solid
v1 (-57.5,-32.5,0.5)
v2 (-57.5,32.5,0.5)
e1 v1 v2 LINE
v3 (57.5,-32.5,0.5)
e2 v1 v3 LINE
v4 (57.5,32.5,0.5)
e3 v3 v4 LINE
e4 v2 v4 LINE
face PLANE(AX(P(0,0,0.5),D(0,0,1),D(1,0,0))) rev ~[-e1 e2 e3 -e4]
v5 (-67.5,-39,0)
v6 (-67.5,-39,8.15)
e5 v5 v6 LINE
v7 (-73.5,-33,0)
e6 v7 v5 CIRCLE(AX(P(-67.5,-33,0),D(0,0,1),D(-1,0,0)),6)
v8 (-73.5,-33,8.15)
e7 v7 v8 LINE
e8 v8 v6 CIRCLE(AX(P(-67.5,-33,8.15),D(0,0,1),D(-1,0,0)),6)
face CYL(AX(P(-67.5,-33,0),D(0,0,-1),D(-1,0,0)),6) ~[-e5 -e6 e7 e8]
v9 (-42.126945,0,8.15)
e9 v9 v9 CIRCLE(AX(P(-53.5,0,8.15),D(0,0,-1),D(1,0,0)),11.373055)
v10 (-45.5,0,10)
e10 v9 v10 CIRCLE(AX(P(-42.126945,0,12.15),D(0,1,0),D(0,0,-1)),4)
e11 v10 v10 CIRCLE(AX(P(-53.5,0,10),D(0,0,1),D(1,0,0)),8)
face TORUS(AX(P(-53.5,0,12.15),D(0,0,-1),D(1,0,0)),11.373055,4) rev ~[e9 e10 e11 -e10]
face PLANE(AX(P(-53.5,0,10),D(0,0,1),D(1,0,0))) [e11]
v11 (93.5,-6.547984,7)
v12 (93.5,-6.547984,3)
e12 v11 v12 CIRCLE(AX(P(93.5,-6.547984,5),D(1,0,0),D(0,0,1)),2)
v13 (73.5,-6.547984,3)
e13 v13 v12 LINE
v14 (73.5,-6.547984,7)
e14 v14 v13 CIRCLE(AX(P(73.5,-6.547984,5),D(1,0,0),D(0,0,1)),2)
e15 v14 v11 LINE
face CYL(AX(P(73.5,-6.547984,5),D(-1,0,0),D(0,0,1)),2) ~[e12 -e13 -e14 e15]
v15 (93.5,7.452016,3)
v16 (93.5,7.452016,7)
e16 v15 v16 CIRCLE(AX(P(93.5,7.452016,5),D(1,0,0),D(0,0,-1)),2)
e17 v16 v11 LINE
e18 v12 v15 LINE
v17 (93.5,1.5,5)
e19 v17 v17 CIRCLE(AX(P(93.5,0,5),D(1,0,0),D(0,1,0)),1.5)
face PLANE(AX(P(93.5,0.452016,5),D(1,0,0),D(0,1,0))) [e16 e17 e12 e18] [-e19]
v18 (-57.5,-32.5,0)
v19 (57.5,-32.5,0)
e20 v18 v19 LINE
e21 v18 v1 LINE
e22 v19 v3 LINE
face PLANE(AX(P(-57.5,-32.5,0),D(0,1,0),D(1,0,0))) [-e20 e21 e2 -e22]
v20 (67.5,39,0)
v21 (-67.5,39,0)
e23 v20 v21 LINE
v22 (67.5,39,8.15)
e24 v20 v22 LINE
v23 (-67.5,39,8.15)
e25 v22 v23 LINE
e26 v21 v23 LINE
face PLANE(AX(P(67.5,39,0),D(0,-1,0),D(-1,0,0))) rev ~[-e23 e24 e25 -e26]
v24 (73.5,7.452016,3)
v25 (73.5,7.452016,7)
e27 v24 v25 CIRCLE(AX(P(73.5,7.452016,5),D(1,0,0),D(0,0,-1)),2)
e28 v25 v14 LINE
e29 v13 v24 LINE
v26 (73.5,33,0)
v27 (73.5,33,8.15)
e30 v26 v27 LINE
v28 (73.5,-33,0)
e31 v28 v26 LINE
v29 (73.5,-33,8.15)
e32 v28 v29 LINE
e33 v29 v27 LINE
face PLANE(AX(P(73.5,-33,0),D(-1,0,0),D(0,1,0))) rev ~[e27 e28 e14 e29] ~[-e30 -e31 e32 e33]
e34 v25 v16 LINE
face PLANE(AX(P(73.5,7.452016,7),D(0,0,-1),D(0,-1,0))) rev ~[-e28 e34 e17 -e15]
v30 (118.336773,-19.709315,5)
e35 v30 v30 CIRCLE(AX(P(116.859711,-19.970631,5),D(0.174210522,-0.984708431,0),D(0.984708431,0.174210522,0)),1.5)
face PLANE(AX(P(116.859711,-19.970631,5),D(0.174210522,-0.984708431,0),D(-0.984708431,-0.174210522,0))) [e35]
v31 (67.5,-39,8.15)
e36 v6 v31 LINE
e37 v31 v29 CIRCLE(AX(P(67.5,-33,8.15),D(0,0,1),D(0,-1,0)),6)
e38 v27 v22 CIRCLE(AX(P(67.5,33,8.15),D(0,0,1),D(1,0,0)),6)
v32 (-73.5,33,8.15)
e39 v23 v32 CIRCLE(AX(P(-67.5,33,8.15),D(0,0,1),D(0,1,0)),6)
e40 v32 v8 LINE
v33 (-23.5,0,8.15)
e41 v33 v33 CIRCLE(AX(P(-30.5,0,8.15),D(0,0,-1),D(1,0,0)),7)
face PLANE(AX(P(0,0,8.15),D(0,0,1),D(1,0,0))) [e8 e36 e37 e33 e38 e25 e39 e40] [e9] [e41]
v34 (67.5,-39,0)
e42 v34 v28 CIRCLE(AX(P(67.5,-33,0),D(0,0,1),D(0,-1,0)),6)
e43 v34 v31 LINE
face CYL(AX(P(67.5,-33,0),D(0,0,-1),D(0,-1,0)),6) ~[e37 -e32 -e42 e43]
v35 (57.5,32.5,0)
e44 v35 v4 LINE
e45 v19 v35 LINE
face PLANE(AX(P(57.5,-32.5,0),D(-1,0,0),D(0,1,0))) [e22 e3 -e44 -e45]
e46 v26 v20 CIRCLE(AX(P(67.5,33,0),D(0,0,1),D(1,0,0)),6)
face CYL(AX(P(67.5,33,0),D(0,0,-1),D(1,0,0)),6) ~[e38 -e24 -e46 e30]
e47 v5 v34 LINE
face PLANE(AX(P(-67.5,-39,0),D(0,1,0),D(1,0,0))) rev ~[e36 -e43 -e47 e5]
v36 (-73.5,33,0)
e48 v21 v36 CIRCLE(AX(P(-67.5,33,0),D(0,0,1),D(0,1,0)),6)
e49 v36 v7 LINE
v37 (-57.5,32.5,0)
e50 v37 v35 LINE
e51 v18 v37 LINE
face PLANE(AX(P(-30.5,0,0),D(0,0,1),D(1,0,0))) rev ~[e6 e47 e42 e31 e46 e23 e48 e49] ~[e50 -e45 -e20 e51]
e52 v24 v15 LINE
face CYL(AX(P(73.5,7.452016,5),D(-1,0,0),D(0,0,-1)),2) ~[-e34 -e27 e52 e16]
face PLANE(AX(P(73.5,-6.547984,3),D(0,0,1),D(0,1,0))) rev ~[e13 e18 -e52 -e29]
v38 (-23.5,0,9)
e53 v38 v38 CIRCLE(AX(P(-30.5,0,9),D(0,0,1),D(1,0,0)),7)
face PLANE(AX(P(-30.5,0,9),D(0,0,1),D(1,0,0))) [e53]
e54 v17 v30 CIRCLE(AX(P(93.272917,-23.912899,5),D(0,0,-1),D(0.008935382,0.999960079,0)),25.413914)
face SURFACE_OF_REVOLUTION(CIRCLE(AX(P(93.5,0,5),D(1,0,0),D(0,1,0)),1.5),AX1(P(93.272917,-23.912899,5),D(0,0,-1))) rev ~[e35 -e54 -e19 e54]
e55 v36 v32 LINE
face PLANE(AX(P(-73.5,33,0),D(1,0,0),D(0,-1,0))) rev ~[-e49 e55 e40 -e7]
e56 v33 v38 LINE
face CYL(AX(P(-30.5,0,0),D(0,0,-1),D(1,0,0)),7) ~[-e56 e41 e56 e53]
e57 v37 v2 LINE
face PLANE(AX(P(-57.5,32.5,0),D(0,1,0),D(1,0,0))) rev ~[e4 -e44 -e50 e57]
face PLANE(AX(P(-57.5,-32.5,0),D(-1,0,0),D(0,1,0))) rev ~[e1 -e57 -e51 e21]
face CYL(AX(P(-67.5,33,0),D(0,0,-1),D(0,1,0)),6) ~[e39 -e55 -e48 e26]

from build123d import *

# Parameters (mm, degrees)
F0_R     = 8
F0_R_2   = 7
F1_DEPTH = 8.15
F2_DEPTH = 10
F3_DEPTH = 9
F5_W     = 115
F5_H     = 65
F6_DEPTH = 0.5
F8_DEPTH = 20
F11_R    = 1.5


# Not quite as in the source:
# - a fillet or chamfer that OpenCascade refuses, or shapes differently, is made with other operations: its cross-section is extruded or revolved along the edge and cut away or added


with BuildPart() as f1:
    # F0 (on Top) → F1 (new body)
    with BuildSketch(Plane.XY):
        with BuildLine():
            Line((-67.5, -39), (67.5, -39))
            ThreePointArc((67.5, -39), (71.7426406871, -37.2426406871), (73.5, -33))
            Line((73.5, -33), (73.5, 33))
            ThreePointArc((73.5, 33), (71.7426406871, 37.2426406871), (67.5, 39))
            Line((67.5, 39), (-67.5, 39))
            ThreePointArc((-67.5, 39), (-71.7426406871, 37.2426406871), (-73.5, 33))
            Line((-73.5, 33), (-73.5, -33))
            ThreePointArc((-73.5, -33), (-71.7426406871, -37.2426406871), (-67.5, -39))
        make_face()
        with Locations((-53.5, 0)):
            Circle(F0_R, mode=Mode.SUBTRACT)
        with Locations((-30.5, 0)):
            Circle(F0_R_2, mode=Mode.SUBTRACT)
        with Locations((-53.5, 0)):
            Circle(F0_R)
        with Locations((-30.5, 0)):
            Circle(F0_R_2)
    extrude(amount=F1_DEPTH)

    # F0 (on Top) → F2 (join)
    with BuildSketch(Plane.XY):
        with Locations((-53.5, 0)):
            Circle(F0_R)
    extrude(amount=F2_DEPTH)

    # F0 (on Top) → F3 (join)
    with BuildSketch(Plane.XY):
        with Locations((-30.5, 0)):
            Circle(F0_R_2)
    extrude(amount=F3_DEPTH)

    # F4: fillet of radius 4 on 1 edges, made by hand

    # F4_s1 → F4_t2 (revolve)
    with BuildSketch(Plane.XZ):
        with BuildLine():
            ThreePointArc((-42.1269450049, 8.15), (-44.0504834111, 8.6428644167), (-45.5, 10))
            Line((-45.5, 10), (-45.5, 8.15))
            Line((-45.5, 8.15), (-42.1269450049, 8.15))
        make_face()
    revolve(axis=Axis((-53.5, 0, 8.15), (0, 0, -1)))

    # F5 (on Top) → F6 (cut)
    with BuildSketch(Plane.XY):
        Rectangle(F5_W, F5_H)
    extrude(amount=F6_DEPTH, mode=Mode.SUBTRACT)

    # F7 (on face) → F8 (join)
    with BuildSketch(Plane.YZ.offset(73.5)):
        with BuildLine():
            ThreePointArc((7.4520160146, 3), (9.4520160146, 5), (7.4520160146, 7))
            Line((7.4520160146, 7), (-6.5479839854, 7))
            ThreePointArc((-6.5479839854, 7), (-8.5479839854, 5), (-6.5479839854, 3))
            Line((-6.5479839854, 3), (7.4520160146, 3))
        make_face()
        with BuildLine():
            ThreePointArc((-1.5, 5), (0, 6.5), (1.5, 5))
            ThreePointArc((1.5, 5), (0, 3.5), (-1.5, 5))
        make_face(mode=Mode.SUBTRACT)
        with BuildLine():
            Line((-1.5, 5), (1.5, 5))
            ThreePointArc((1.5, 5), (0, 6.5), (-1.5, 5))
        make_face()
        with BuildLine():
            ThreePointArc((-1.5, 5), (0, 3.5), (1.5, 5))
            Line((1.5, 5), (-1.5, 5))
        make_face()
    extrude(amount=F8_DEPTH)

    # F12: sweep along a path in F10
    with BuildLine(Plane(origin=(0, 0, 5), x_dir=(1, 0, 0), z_dir=(0, 0, -1))) as f12_path:
        ThreePointArc((93.5, 0), (108.8125986956, 5.7360841116), (116.8597106736, 19.970631121))
    # F11 (on face) → F12 (sweep)
    with BuildSketch(Plane.YZ.offset(93.5)):
        with Locations((0, 5)):
            Circle(F11_R)
    sweep(path=f12_path.line)


solid = f1.part
